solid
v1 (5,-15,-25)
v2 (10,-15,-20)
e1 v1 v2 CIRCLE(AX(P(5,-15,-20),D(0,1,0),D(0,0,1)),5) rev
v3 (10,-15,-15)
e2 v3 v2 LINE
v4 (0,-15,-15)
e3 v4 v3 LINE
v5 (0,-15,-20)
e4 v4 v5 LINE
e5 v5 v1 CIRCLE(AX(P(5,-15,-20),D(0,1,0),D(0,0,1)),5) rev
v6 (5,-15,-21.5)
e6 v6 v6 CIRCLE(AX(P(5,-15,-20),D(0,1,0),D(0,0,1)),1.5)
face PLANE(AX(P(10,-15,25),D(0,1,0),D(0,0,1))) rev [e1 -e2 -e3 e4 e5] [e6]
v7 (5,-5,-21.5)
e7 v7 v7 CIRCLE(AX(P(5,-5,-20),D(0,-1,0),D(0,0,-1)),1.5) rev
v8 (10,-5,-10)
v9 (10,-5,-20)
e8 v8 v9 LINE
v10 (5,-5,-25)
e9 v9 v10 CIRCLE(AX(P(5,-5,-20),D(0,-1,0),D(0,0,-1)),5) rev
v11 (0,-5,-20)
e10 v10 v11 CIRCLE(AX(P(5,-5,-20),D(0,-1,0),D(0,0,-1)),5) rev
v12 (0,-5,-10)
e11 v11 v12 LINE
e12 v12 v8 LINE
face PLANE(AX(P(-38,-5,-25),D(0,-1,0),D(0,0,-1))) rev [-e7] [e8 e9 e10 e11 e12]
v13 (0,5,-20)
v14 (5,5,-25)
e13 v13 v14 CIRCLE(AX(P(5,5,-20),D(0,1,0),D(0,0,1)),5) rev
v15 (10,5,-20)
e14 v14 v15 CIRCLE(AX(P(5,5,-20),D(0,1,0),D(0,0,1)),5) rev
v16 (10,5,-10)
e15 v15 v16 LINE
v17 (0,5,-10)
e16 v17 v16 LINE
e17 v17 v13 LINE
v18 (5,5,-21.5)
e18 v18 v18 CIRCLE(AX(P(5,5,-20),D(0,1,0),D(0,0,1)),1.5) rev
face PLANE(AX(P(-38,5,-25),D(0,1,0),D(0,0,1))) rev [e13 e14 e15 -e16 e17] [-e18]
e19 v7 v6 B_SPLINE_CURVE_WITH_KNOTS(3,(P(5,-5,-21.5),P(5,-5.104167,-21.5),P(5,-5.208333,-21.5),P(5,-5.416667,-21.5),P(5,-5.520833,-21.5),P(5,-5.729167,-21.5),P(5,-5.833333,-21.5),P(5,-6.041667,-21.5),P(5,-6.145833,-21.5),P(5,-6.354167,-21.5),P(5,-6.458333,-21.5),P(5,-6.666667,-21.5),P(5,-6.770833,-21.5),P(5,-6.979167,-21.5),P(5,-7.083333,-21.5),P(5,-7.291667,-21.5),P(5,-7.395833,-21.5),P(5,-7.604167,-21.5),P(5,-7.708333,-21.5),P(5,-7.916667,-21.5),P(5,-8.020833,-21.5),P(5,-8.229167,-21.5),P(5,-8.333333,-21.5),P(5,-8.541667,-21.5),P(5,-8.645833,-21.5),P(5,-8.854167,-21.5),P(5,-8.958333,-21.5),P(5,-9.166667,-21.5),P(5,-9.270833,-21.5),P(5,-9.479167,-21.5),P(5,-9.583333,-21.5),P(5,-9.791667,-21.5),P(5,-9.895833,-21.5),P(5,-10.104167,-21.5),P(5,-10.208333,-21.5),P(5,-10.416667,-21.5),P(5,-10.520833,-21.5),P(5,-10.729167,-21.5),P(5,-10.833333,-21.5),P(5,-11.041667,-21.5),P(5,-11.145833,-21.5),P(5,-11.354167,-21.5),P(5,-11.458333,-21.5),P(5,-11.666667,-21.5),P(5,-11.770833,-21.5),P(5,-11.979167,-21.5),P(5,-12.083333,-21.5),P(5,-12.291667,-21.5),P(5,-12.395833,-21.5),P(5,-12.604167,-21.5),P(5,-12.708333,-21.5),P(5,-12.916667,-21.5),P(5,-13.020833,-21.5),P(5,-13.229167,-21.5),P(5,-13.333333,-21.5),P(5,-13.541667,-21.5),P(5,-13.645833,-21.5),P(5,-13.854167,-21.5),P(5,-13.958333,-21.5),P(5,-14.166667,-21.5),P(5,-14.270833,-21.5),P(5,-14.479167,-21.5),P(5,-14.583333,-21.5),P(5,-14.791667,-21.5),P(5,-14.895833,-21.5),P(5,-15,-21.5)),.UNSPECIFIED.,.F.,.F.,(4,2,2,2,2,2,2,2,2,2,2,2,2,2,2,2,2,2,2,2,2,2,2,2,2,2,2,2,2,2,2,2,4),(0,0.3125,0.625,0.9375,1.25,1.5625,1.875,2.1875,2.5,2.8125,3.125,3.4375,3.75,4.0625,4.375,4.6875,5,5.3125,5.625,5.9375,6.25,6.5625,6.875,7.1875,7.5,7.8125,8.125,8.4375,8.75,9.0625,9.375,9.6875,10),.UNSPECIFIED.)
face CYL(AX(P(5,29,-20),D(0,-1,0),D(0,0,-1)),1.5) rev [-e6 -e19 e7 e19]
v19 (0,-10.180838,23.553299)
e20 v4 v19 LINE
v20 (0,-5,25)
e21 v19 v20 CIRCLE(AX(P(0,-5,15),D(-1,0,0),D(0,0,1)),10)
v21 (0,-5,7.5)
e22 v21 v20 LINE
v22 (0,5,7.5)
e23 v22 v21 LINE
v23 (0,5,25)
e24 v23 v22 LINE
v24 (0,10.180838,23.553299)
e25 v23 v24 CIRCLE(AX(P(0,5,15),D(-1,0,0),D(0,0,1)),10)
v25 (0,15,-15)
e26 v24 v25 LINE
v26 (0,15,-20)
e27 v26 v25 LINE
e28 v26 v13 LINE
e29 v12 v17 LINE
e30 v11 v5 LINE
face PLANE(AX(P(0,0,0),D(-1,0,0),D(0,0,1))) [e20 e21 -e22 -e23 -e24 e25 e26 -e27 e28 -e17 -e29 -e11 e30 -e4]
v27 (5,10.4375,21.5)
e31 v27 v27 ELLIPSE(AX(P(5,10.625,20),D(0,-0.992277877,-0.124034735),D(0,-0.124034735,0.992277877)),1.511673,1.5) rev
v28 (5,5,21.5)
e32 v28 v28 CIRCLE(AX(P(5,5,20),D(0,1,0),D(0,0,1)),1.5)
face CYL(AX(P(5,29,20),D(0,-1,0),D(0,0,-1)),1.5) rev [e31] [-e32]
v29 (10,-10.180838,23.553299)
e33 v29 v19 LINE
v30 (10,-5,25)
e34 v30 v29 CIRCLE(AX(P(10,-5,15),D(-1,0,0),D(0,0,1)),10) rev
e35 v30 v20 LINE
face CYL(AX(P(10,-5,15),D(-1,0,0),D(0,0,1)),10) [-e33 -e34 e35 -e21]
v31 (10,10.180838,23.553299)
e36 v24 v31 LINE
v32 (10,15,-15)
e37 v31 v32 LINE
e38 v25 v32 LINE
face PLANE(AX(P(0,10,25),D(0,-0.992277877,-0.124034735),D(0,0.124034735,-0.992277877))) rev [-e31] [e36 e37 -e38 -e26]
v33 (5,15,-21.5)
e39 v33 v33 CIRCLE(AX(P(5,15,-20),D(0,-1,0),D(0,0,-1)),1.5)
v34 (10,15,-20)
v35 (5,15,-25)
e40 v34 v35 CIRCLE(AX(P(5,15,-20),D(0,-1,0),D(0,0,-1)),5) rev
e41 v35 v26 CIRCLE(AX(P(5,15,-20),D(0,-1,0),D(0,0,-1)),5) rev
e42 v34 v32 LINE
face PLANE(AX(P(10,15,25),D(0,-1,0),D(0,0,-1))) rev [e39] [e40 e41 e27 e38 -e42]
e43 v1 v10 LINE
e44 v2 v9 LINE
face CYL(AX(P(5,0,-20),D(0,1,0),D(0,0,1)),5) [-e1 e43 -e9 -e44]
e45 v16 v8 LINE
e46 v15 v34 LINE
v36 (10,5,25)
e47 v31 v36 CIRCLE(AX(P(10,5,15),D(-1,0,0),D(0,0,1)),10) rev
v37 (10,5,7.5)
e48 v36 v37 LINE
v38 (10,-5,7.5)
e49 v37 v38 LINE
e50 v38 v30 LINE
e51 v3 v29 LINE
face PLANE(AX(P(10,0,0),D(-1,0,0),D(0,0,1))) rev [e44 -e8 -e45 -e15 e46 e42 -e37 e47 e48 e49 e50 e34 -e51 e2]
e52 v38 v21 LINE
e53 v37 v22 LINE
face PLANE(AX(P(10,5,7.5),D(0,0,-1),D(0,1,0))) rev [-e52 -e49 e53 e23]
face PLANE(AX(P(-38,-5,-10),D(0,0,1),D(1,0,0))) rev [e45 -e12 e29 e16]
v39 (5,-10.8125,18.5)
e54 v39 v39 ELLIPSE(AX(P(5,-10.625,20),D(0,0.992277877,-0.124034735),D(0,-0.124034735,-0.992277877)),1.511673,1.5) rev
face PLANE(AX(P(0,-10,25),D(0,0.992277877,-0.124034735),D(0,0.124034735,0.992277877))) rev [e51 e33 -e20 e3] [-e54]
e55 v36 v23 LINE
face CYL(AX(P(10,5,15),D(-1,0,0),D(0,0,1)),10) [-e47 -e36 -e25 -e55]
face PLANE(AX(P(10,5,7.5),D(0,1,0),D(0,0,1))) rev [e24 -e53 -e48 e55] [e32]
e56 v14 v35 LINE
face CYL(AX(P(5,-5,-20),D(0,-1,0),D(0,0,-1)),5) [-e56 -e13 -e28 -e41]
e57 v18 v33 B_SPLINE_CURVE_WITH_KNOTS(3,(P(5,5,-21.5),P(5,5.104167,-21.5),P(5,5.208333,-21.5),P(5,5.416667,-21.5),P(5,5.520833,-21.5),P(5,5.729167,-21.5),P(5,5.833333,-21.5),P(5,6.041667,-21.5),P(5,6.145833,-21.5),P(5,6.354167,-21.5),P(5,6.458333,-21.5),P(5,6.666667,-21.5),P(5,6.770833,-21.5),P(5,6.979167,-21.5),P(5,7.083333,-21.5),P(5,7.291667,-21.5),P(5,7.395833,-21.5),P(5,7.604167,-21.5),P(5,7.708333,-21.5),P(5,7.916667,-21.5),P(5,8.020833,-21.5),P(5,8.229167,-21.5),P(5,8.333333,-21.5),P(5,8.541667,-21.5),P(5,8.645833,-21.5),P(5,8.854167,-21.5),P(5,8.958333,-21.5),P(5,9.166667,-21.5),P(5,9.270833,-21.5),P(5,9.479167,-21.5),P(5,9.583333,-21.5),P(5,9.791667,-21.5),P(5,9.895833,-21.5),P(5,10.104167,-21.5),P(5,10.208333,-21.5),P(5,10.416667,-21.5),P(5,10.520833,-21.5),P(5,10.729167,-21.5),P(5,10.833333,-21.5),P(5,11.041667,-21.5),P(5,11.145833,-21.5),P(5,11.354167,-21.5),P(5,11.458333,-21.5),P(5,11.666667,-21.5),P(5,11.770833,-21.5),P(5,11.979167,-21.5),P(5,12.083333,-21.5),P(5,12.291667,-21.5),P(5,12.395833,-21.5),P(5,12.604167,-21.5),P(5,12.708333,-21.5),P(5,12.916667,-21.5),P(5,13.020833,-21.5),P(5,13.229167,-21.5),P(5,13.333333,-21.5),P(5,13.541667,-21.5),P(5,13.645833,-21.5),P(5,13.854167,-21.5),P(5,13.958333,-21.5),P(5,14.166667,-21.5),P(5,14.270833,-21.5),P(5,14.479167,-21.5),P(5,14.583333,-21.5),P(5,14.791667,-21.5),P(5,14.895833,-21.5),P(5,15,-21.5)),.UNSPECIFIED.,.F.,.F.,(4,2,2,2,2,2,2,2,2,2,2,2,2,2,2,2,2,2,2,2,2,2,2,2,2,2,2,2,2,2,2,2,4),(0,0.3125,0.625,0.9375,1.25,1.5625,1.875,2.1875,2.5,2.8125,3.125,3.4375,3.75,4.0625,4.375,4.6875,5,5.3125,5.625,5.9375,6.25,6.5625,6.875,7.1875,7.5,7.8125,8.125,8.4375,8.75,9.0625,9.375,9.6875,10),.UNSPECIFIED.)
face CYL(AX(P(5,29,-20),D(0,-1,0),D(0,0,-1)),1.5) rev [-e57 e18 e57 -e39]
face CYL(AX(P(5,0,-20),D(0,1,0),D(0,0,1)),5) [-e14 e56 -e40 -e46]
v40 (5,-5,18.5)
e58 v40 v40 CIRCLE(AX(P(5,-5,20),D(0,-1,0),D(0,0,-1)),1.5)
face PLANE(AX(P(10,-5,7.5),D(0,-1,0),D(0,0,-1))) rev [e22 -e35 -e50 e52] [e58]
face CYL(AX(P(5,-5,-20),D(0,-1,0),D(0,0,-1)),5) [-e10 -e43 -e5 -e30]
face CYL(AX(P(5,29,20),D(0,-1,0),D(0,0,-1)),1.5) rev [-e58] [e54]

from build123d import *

# Parameters (mm, degrees)
SALIENTE_EXTRUIR1_DEPTH = 10
REDONDEO4_R             = 10
CROQUIS2_R              = 1.5
CORTAR_EXTRUIR1_DEPTH   = 24
CROQUIS3_W              = 15
CROQUIS3_H              = 10
CORTAR_EXTRUIR2_DEPTH   = 48
REDONDEO6_R             = 5
CORTAR_EXTRUIR3_DEPTH   = 10


with BuildPart() as part:
    # Croquis1 → Saliente-Extruir1 (new body)
    with BuildSketch(Plane(origin=(0, 0, 0), x_dir=(0, 0, -1), z_dir=(1, 0, 0))):
        Polygon((-7.5, 5), (-7.5, -5), (-25, -5), (-25, -15), (25, -15), (25, -5), (25, 5), (25, 15), (-25, 15), (-25, 5), align=None)
    extrude(amount=SALIENTE_EXTRUIR1_DEPTH)

    # Redondeo4
    redondeo4_edges = [part.edges().sort_by_distance(p)[0] for p in [
        (5, 15, 25),
        (5, -15, 25),
    ]]
    fillet(redondeo4_edges, radius=REDONDEO4_R - 0.0001)  # a hair under: the kernel refuses the full size

    # Croquis2 → Cortar-Extruir1 (cut, symmetric)
    with BuildSketch(Plane.XZ.offset(-5)):
        with Locations(Location((5, 20, 0), (0, 0, 270))):
            Circle(CROQUIS2_R)
        with Locations(Location((5, -20, 0), (0, 0, 270))):
            Circle(CROQUIS2_R)
    extrude(amount=CORTAR_EXTRUIR1_DEPTH, both=True, mode=Mode.SUBTRACT)

    # Croquis3 → Cortar-Extruir2 (cut)
    with BuildSketch(Plane(origin=(10, 0, 0), x_dir=(0, 0, -1), z_dir=(1, 0, 0))):
        with Locations((17.5, 0)):
            Rectangle(CROQUIS3_W, CROQUIS3_H)
    extrude(amount=-CORTAR_EXTRUIR2_DEPTH, mode=Mode.SUBTRACT)

    # Redondeo6
    redondeo6_edges = [part.edges().sort_by_distance(p)[0] for p in [
        (10, 10, -25),
        (0, 10, -25),
        (10, -10, -25),
        (0, -10, -25),
    ]]
    fillet(redondeo6_edges, radius=REDONDEO6_R - 0.0001)  # a hair under: the kernel refuses the full size

    # Croquis4 → Cortar-Extruir3 (cut)
    with BuildSketch(Plane(origin=(10, 0, 0), x_dir=(0, 0, -1), z_dir=(1, 0, 0))):
        Polygon((-25, 10), (15, 15), (-25, 17.816893643), align=None)
        Polygon((-25, -10), (15, -15), (-25, -17.816893643), align=None)
    extrude(amount=-CORTAR_EXTRUIR3_DEPTH, mode=Mode.SUBTRACT)


solid = part.part
